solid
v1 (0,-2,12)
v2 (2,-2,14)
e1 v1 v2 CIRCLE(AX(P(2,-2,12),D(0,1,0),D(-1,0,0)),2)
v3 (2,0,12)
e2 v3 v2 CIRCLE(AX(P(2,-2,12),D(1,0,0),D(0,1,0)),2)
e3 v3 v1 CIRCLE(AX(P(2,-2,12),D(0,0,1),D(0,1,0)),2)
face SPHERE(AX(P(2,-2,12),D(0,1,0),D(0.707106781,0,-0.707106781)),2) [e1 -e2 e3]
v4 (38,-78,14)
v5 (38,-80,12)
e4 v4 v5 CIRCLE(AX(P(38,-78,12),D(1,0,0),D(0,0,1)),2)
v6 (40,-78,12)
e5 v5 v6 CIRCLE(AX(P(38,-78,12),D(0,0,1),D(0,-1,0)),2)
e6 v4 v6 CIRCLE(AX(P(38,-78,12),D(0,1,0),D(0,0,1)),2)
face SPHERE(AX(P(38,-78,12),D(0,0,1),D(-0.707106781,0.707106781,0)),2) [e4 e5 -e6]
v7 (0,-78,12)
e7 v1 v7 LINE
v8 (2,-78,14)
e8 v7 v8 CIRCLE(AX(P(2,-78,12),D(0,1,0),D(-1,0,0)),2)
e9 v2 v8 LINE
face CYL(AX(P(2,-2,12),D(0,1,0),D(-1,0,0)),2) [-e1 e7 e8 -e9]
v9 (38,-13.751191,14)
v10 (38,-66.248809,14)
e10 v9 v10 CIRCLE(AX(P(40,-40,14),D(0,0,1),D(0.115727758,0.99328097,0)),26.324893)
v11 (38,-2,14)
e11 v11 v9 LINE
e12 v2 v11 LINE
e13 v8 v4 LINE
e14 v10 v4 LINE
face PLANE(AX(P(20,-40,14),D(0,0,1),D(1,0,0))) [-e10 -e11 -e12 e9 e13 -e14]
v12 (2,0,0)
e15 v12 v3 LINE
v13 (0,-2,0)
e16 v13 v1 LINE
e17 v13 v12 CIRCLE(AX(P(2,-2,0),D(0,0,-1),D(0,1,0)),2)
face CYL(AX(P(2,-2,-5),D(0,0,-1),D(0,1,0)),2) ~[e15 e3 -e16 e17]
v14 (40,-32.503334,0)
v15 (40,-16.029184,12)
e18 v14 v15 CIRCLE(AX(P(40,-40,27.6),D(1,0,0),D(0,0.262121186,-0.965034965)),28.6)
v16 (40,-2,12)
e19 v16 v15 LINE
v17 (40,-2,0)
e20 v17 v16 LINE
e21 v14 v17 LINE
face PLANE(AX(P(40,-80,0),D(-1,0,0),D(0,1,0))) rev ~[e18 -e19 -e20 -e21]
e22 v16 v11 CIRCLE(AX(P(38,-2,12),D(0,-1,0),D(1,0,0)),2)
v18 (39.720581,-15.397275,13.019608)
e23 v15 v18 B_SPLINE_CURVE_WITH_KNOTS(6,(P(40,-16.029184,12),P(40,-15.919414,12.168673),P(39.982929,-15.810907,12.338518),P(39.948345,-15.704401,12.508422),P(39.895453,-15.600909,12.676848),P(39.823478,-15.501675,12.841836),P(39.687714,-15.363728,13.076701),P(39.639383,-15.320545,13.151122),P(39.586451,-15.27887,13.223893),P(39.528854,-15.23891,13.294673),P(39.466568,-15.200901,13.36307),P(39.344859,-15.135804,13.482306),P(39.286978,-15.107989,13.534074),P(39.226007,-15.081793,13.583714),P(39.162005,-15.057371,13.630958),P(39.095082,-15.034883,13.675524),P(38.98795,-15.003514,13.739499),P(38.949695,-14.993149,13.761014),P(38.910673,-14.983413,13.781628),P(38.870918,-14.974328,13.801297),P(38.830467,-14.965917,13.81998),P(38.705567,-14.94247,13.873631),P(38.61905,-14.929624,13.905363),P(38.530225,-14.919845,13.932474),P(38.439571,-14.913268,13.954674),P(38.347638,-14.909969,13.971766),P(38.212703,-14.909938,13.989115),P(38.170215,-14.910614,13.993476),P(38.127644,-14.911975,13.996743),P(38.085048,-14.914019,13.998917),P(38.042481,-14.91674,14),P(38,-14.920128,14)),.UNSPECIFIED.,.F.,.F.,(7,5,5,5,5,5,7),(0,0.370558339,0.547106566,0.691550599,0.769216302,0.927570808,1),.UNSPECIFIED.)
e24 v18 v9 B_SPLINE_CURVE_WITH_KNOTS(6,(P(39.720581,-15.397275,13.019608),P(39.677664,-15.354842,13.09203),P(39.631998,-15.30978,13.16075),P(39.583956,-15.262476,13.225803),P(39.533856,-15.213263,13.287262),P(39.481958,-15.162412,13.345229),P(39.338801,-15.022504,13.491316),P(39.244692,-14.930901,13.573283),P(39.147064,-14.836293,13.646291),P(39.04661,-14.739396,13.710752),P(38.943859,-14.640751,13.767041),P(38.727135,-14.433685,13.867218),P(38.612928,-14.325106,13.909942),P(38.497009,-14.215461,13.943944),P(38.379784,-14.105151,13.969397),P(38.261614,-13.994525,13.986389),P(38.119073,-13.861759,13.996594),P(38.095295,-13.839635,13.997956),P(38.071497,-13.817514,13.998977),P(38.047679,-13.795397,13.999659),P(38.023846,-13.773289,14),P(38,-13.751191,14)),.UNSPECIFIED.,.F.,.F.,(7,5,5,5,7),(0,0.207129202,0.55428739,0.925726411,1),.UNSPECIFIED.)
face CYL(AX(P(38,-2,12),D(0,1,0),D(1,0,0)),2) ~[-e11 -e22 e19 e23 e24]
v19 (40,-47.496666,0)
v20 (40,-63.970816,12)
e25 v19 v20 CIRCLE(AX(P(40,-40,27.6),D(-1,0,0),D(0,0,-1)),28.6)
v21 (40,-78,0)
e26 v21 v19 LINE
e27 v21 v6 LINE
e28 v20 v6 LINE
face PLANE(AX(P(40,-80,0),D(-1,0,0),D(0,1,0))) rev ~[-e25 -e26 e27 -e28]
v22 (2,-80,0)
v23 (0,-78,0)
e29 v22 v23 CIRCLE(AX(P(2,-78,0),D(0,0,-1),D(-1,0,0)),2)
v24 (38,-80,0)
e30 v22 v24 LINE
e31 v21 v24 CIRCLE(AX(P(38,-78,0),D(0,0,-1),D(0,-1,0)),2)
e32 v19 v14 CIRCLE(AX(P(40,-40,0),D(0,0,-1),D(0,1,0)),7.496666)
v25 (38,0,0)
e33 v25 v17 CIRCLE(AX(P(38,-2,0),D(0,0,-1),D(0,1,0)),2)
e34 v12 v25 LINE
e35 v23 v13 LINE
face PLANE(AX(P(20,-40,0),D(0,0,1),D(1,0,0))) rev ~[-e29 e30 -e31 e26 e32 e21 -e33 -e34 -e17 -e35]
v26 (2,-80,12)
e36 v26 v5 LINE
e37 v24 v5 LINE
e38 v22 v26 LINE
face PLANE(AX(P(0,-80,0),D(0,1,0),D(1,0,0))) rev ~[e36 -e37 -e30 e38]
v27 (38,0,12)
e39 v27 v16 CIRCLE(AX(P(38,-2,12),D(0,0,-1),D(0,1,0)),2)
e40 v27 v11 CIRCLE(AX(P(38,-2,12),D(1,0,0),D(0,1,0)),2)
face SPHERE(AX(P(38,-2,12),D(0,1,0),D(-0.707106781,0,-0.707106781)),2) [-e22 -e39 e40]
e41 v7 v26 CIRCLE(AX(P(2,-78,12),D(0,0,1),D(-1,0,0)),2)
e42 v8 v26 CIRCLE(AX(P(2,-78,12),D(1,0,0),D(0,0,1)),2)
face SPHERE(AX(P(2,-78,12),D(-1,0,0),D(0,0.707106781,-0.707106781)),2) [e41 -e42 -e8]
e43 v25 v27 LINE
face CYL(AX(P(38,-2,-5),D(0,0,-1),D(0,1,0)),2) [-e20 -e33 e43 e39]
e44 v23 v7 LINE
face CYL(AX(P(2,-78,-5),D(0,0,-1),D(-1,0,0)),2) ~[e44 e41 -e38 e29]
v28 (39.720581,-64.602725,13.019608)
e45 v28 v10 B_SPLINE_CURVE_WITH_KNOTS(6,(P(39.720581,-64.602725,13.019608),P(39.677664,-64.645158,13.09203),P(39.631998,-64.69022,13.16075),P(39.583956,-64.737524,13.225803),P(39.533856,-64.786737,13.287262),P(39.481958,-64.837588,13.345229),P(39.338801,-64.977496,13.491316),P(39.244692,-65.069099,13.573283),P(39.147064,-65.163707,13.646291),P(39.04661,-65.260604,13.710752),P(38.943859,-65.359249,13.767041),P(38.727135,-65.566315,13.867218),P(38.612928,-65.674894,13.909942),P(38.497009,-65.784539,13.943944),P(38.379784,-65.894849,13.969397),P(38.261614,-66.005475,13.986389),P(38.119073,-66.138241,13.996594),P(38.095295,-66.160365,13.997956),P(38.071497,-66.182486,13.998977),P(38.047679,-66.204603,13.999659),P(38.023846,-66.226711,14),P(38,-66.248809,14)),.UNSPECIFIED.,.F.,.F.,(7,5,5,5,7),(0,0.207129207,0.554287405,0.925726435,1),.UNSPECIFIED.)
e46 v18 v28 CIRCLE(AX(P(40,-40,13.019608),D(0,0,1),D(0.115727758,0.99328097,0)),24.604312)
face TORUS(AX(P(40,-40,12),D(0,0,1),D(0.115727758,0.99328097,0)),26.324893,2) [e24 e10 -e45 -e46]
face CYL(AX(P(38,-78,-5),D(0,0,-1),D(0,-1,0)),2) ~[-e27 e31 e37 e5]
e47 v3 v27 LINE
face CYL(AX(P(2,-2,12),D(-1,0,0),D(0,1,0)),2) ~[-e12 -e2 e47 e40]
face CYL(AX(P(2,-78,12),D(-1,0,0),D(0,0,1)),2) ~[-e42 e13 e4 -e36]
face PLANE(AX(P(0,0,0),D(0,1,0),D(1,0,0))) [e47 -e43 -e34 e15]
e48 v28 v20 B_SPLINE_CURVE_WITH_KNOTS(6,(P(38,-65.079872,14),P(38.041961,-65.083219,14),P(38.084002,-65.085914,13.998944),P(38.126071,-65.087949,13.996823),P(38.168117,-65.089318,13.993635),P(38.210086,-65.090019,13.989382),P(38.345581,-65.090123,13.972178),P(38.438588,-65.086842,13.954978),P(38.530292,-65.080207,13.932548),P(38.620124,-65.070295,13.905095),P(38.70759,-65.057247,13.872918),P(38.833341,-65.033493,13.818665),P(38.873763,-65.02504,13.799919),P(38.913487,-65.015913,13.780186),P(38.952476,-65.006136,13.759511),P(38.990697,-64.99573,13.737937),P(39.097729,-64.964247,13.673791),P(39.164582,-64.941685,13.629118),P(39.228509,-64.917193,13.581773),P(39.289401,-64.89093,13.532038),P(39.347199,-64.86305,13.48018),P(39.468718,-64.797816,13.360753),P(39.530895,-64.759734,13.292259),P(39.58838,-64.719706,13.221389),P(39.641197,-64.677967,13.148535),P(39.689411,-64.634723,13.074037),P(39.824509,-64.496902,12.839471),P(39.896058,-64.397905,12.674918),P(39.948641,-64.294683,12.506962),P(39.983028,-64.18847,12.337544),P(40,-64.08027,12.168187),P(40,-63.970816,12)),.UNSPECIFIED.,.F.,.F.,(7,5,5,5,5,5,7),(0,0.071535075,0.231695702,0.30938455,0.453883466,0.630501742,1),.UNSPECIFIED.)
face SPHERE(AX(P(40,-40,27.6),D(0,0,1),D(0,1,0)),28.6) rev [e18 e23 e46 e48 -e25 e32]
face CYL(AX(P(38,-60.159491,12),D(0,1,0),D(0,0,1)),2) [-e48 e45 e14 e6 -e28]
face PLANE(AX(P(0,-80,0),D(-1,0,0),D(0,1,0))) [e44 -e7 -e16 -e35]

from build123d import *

# Parameters (mm, degrees)
F0_W         = 40
F0_H         = 80
F1_DEPTH     = 14
F4_T1_DEPTH  = 17.8405087492
F4_T3_DEPTH  = 17.8405087492
F4_T5_DEPTH  = 36
F4_T7_DEPTH  = 76
F4_T9_DEPTH  = 17
F4_S13_W     = 2
F4_S13_H     = 2
F4_T14_DEPTH = 2
F4_S19_W     = 2
F4_S19_H     = 2
F4_T20_DEPTH = 2
F4_S25_W     = 2
F4_S25_H     = 2
F4_T26_DEPTH = 2
F4_S31_W     = 2
F4_S31_H     = 2
F4_T32_DEPTH = 2
F4_T36_ANGLE = 193.2912055484


# Not quite as in the source:
# - a fillet or chamfer that OpenCascade refuses, or shapes differently, is made with other operations: its cross-section is extruded or revolved along the edge and cut away or added


with BuildPart() as f1:
    # F0 (on Top) → F1 (new body)
    with BuildSketch(Plane.XY):
        with Locations((20, -40)):
            Rectangle(F0_W, F0_H)
    extrude(amount=F1_DEPTH)

    # F2 (on face) → F3 (revolve, cut)
    with BuildSketch(Plane.YZ.offset(40)):
        with BuildLine():
            Line((-40, 0), (-32.5033340744, 0))
            ThreePointArc((-32.5033340744, 0), (-22.2346925053, 5.186748348), (-14.8405087492, 14))
            Line((-14.8405087492, 14), (-40, 14))
            Line((-40, 14), (-40, 0))
        make_face()
        with BuildLine():
            Line((-40, 14), (-14.8405087492, 14))
            ThreePointArc((-14.8405087492, 14), (-15.4345771459, 42.2458185159), (-40, 56.2))
            Line((-40, 56.2), (-40, 14))
        make_face()
        with BuildLine():
            Line((-40, 0), (-40, -1))
            ThreePointArc((-40, -1), (-36.2184659198, -0.7488976858), (-32.5033340744, 0))
            Line((-32.5033340744, 0), (-40, 0))
        make_face()
    revolve(axis=Axis((40, -40, 27.6), (0, 0, -1)), mode=Mode.SUBTRACT)

    # F4: fillet of radius 2 on 10 edges, made by hand

    # F4_s2 → F4_t1 (cut)
    with BuildSketch(Plane.XZ.offset(2)):
        with BuildLine():
            ThreePointArc((40, 12), (39.4142135624, 13.4142135624), (38, 14))
            Line((38, 14), (40, 14))
            Line((40, 14), (40, 12))
        make_face()
    extrude(amount=F4_T1_DEPTH, mode=Mode.SUBTRACT)

    # F4_s4 → F4_t3 (cut)
    with BuildSketch(Plane.XZ.offset(60.1594912508)):
        with BuildLine():
            ThreePointArc((38, 14), (39.4142135624, 13.4142135624), (40, 12))
            Line((40, 12), (40, 14))
            Line((40, 14), (38, 14))
        make_face()
    extrude(amount=F4_T3_DEPTH, mode=Mode.SUBTRACT)

    # F4_s6 → F4_t5 (cut)
    with BuildSketch(Plane.YZ.offset(2)):
        with BuildLine():
            ThreePointArc((-78, 14), (-79.4142135624, 13.4142135624), (-80, 12))
            Line((-80, 12), (-80, 14))
            Line((-80, 14), (-78, 14))
        make_face()
        with BuildLine():
            ThreePointArc((0, 12), (-0.5857864376, 13.4142135624), (-2, 14))
            Line((-2, 14), (0, 14))
            Line((0, 14), (0, 12))
        make_face()
    extrude(amount=F4_T5_DEPTH, mode=Mode.SUBTRACT)

    # F4_s8 → F4_t7 (cut)
    with BuildSketch(Plane.XZ.offset(2)):
        with BuildLine():
            ThreePointArc((0, 12), (0.5857864376, 13.4142135624), (2, 14))
            Line((2, 14), (0, 14))
            Line((0, 14), (0, 12))
        make_face()
    extrude(amount=F4_T7_DEPTH, mode=Mode.SUBTRACT)

    # F4_s10 → F4_t9 (cut)
    with BuildSketch(Plane.XY.offset(-5)):
        with BuildLine():
            ThreePointArc((38, -80), (39.4142135624, -79.4142135624), (40, -78))
            Line((40, -78), (40, -80))
            Line((40, -80), (38, -80))
        make_face()
        with BuildLine():
            ThreePointArc((0, -78), (0.5857864376, -79.4142135624), (2, -80))
            Line((2, -80), (0, -80))
            Line((0, -80), (0, -78))
        make_face()
        with BuildLine():
            ThreePointArc((38, 0), (39.4142135624, -0.5857864376), (40, -2))
            Line((40, -2), (40, 0))
            Line((40, 0), (38, 0))
        make_face()
        with BuildLine():
            ThreePointArc((2, 0), (0.5857864376, -0.5857864376), (0, -2))
            Line((0, -2), (0, 0))
            Line((0, 0), (2, 0))
        make_face()
    extrude(amount=F4_T9_DEPTH, mode=Mode.SUBTRACT)


with BuildPart() as f4_tool12:
    # F4_s13 → F4_t14 (new body)
    with BuildSketch(Plane.XZ.offset(2)):
        with Locations((39, 13)):
            Rectangle(F4_S13_W, F4_S13_H)
    extrude(amount=-F4_T14_DEPTH)

    # F4_s15 → F4_t16 (revolve, cut)
    with BuildSketch(Plane(origin=(38, -2, 12), x_dir=(-0.7071067812, 0, -0.7071067812), z_dir=(0.7071067812, 0, -0.7071067812))):
        with BuildLine():
            ThreePointArc((0, -2), (2, 0), (0, 2))
            Line((0, 2), (0, -2))
        make_face()
    revolve(axis=Axis((38, -2, 12), (0, 1, 0)), mode=Mode.SUBTRACT)


with BuildPart() as f1_1:
    add(f1.part)

    # F4_t11: cut F4_tool12
    add(f4_tool12.part, mode=Mode.SUBTRACT)


with BuildPart() as f4_tool18:
    # F4_s19 → F4_t20 (new body)
    with BuildSketch(Plane.XY.offset(12)):
        with Locations((39, -79)):
            Rectangle(F4_S19_W, F4_S19_H)
    extrude(amount=F4_T20_DEPTH)

    # F4_s21 → F4_t22 (revolve, cut)
    with BuildSketch(Plane(origin=(38, -78, 12), x_dir=(-0.7071067812, 0.7071067812, 0), z_dir=(0.7071067812, 0.7071067812, 0))):
        with BuildLine():
            ThreePointArc((0, -2), (2, 0), (0, 2))
            Line((0, 2), (0, -2))
        make_face()
    revolve(axis=Axis((38, -78, 12), (0, 0, 1)), mode=Mode.SUBTRACT)


with BuildPart() as f1_2:
    add(f1_1.part)

    # F4_t17: cut F4_tool18
    add(f4_tool18.part, mode=Mode.SUBTRACT)


with BuildPart() as f4_tool24:
    # F4_s25 → F4_t26 (new body)
    with BuildSketch(Plane.YZ.offset(2)):
        with Locations((-79, 13)):
            Rectangle(F4_S25_W, F4_S25_H)
    extrude(amount=-F4_T26_DEPTH)

    # F4_s27 → F4_t28 (revolve, cut)
    with BuildSketch(Plane(origin=(2, -78, 12), x_dir=(0, 0.7071067812, -0.7071067812), z_dir=(0, 0.7071067812, 0.7071067812))):
        with BuildLine():
            ThreePointArc((0, -2), (2, 0), (0, 2))
            Line((0, 2), (0, -2))
        make_face()
    revolve(axis=Axis((2, -78, 12), (-1, 0, 0)), mode=Mode.SUBTRACT)


with BuildPart() as f1_3:
    add(f1_2.part)

    # F4_t23: cut F4_tool24
    add(f4_tool24.part, mode=Mode.SUBTRACT)


with BuildPart() as f4_tool30:
    # F4_s31 → F4_t32 (new body)
    with BuildSketch(Plane.XZ.offset(2)):
        with Locations((1, 13)):
            Rectangle(F4_S31_W, F4_S31_H)
    extrude(amount=-F4_T32_DEPTH)

    # F4_s33 → F4_t34 (revolve, cut)
    with BuildSketch(Plane(origin=(2, -2, 12), x_dir=(0.7071067812, 0, -0.7071067812), z_dir=(0.7071067812, 0, 0.7071067812))):
        with BuildLine():
            ThreePointArc((0, -2), (2, 0), (0, 2))
            Line((0, 2), (0, -2))
        make_face()
    revolve(axis=Axis((2, -2, 12), (0, 1, 0)), mode=Mode.SUBTRACT)


with BuildPart() as f1_4:
    add(f1_3.part)

    # F4_t29: cut F4_tool30
    add(f4_tool30.part, mode=Mode.SUBTRACT)

    # F4_s35 → F4_t36 (revolve, cut)
    with BuildSketch(Plane(origin=(44.0622906263, -5.1337237407, 0), x_dir=(0, 0, 1), z_dir=(0.9932809704, -0.1157277578, 0))):
        with BuildLine():
            ThreePointArc((14, 8.7772353391), (13.7377018856, 9.7673828821), (13.0196078431, 10.4978165916))
            ThreePointArc((13.0196078431, 10.4978165916), (13.5070698024, 10.2153987353), (14, 9.9426372505))
            Line((14, 9.9426372505), (14, 8.7772353391))
        make_face()
    revolve(axis=Axis((40, -40, 14), (0, 0, 1)), revolution_arc=F4_T36_ANGLE, mode=Mode.SUBTRACT)


solid = f1_4.part
